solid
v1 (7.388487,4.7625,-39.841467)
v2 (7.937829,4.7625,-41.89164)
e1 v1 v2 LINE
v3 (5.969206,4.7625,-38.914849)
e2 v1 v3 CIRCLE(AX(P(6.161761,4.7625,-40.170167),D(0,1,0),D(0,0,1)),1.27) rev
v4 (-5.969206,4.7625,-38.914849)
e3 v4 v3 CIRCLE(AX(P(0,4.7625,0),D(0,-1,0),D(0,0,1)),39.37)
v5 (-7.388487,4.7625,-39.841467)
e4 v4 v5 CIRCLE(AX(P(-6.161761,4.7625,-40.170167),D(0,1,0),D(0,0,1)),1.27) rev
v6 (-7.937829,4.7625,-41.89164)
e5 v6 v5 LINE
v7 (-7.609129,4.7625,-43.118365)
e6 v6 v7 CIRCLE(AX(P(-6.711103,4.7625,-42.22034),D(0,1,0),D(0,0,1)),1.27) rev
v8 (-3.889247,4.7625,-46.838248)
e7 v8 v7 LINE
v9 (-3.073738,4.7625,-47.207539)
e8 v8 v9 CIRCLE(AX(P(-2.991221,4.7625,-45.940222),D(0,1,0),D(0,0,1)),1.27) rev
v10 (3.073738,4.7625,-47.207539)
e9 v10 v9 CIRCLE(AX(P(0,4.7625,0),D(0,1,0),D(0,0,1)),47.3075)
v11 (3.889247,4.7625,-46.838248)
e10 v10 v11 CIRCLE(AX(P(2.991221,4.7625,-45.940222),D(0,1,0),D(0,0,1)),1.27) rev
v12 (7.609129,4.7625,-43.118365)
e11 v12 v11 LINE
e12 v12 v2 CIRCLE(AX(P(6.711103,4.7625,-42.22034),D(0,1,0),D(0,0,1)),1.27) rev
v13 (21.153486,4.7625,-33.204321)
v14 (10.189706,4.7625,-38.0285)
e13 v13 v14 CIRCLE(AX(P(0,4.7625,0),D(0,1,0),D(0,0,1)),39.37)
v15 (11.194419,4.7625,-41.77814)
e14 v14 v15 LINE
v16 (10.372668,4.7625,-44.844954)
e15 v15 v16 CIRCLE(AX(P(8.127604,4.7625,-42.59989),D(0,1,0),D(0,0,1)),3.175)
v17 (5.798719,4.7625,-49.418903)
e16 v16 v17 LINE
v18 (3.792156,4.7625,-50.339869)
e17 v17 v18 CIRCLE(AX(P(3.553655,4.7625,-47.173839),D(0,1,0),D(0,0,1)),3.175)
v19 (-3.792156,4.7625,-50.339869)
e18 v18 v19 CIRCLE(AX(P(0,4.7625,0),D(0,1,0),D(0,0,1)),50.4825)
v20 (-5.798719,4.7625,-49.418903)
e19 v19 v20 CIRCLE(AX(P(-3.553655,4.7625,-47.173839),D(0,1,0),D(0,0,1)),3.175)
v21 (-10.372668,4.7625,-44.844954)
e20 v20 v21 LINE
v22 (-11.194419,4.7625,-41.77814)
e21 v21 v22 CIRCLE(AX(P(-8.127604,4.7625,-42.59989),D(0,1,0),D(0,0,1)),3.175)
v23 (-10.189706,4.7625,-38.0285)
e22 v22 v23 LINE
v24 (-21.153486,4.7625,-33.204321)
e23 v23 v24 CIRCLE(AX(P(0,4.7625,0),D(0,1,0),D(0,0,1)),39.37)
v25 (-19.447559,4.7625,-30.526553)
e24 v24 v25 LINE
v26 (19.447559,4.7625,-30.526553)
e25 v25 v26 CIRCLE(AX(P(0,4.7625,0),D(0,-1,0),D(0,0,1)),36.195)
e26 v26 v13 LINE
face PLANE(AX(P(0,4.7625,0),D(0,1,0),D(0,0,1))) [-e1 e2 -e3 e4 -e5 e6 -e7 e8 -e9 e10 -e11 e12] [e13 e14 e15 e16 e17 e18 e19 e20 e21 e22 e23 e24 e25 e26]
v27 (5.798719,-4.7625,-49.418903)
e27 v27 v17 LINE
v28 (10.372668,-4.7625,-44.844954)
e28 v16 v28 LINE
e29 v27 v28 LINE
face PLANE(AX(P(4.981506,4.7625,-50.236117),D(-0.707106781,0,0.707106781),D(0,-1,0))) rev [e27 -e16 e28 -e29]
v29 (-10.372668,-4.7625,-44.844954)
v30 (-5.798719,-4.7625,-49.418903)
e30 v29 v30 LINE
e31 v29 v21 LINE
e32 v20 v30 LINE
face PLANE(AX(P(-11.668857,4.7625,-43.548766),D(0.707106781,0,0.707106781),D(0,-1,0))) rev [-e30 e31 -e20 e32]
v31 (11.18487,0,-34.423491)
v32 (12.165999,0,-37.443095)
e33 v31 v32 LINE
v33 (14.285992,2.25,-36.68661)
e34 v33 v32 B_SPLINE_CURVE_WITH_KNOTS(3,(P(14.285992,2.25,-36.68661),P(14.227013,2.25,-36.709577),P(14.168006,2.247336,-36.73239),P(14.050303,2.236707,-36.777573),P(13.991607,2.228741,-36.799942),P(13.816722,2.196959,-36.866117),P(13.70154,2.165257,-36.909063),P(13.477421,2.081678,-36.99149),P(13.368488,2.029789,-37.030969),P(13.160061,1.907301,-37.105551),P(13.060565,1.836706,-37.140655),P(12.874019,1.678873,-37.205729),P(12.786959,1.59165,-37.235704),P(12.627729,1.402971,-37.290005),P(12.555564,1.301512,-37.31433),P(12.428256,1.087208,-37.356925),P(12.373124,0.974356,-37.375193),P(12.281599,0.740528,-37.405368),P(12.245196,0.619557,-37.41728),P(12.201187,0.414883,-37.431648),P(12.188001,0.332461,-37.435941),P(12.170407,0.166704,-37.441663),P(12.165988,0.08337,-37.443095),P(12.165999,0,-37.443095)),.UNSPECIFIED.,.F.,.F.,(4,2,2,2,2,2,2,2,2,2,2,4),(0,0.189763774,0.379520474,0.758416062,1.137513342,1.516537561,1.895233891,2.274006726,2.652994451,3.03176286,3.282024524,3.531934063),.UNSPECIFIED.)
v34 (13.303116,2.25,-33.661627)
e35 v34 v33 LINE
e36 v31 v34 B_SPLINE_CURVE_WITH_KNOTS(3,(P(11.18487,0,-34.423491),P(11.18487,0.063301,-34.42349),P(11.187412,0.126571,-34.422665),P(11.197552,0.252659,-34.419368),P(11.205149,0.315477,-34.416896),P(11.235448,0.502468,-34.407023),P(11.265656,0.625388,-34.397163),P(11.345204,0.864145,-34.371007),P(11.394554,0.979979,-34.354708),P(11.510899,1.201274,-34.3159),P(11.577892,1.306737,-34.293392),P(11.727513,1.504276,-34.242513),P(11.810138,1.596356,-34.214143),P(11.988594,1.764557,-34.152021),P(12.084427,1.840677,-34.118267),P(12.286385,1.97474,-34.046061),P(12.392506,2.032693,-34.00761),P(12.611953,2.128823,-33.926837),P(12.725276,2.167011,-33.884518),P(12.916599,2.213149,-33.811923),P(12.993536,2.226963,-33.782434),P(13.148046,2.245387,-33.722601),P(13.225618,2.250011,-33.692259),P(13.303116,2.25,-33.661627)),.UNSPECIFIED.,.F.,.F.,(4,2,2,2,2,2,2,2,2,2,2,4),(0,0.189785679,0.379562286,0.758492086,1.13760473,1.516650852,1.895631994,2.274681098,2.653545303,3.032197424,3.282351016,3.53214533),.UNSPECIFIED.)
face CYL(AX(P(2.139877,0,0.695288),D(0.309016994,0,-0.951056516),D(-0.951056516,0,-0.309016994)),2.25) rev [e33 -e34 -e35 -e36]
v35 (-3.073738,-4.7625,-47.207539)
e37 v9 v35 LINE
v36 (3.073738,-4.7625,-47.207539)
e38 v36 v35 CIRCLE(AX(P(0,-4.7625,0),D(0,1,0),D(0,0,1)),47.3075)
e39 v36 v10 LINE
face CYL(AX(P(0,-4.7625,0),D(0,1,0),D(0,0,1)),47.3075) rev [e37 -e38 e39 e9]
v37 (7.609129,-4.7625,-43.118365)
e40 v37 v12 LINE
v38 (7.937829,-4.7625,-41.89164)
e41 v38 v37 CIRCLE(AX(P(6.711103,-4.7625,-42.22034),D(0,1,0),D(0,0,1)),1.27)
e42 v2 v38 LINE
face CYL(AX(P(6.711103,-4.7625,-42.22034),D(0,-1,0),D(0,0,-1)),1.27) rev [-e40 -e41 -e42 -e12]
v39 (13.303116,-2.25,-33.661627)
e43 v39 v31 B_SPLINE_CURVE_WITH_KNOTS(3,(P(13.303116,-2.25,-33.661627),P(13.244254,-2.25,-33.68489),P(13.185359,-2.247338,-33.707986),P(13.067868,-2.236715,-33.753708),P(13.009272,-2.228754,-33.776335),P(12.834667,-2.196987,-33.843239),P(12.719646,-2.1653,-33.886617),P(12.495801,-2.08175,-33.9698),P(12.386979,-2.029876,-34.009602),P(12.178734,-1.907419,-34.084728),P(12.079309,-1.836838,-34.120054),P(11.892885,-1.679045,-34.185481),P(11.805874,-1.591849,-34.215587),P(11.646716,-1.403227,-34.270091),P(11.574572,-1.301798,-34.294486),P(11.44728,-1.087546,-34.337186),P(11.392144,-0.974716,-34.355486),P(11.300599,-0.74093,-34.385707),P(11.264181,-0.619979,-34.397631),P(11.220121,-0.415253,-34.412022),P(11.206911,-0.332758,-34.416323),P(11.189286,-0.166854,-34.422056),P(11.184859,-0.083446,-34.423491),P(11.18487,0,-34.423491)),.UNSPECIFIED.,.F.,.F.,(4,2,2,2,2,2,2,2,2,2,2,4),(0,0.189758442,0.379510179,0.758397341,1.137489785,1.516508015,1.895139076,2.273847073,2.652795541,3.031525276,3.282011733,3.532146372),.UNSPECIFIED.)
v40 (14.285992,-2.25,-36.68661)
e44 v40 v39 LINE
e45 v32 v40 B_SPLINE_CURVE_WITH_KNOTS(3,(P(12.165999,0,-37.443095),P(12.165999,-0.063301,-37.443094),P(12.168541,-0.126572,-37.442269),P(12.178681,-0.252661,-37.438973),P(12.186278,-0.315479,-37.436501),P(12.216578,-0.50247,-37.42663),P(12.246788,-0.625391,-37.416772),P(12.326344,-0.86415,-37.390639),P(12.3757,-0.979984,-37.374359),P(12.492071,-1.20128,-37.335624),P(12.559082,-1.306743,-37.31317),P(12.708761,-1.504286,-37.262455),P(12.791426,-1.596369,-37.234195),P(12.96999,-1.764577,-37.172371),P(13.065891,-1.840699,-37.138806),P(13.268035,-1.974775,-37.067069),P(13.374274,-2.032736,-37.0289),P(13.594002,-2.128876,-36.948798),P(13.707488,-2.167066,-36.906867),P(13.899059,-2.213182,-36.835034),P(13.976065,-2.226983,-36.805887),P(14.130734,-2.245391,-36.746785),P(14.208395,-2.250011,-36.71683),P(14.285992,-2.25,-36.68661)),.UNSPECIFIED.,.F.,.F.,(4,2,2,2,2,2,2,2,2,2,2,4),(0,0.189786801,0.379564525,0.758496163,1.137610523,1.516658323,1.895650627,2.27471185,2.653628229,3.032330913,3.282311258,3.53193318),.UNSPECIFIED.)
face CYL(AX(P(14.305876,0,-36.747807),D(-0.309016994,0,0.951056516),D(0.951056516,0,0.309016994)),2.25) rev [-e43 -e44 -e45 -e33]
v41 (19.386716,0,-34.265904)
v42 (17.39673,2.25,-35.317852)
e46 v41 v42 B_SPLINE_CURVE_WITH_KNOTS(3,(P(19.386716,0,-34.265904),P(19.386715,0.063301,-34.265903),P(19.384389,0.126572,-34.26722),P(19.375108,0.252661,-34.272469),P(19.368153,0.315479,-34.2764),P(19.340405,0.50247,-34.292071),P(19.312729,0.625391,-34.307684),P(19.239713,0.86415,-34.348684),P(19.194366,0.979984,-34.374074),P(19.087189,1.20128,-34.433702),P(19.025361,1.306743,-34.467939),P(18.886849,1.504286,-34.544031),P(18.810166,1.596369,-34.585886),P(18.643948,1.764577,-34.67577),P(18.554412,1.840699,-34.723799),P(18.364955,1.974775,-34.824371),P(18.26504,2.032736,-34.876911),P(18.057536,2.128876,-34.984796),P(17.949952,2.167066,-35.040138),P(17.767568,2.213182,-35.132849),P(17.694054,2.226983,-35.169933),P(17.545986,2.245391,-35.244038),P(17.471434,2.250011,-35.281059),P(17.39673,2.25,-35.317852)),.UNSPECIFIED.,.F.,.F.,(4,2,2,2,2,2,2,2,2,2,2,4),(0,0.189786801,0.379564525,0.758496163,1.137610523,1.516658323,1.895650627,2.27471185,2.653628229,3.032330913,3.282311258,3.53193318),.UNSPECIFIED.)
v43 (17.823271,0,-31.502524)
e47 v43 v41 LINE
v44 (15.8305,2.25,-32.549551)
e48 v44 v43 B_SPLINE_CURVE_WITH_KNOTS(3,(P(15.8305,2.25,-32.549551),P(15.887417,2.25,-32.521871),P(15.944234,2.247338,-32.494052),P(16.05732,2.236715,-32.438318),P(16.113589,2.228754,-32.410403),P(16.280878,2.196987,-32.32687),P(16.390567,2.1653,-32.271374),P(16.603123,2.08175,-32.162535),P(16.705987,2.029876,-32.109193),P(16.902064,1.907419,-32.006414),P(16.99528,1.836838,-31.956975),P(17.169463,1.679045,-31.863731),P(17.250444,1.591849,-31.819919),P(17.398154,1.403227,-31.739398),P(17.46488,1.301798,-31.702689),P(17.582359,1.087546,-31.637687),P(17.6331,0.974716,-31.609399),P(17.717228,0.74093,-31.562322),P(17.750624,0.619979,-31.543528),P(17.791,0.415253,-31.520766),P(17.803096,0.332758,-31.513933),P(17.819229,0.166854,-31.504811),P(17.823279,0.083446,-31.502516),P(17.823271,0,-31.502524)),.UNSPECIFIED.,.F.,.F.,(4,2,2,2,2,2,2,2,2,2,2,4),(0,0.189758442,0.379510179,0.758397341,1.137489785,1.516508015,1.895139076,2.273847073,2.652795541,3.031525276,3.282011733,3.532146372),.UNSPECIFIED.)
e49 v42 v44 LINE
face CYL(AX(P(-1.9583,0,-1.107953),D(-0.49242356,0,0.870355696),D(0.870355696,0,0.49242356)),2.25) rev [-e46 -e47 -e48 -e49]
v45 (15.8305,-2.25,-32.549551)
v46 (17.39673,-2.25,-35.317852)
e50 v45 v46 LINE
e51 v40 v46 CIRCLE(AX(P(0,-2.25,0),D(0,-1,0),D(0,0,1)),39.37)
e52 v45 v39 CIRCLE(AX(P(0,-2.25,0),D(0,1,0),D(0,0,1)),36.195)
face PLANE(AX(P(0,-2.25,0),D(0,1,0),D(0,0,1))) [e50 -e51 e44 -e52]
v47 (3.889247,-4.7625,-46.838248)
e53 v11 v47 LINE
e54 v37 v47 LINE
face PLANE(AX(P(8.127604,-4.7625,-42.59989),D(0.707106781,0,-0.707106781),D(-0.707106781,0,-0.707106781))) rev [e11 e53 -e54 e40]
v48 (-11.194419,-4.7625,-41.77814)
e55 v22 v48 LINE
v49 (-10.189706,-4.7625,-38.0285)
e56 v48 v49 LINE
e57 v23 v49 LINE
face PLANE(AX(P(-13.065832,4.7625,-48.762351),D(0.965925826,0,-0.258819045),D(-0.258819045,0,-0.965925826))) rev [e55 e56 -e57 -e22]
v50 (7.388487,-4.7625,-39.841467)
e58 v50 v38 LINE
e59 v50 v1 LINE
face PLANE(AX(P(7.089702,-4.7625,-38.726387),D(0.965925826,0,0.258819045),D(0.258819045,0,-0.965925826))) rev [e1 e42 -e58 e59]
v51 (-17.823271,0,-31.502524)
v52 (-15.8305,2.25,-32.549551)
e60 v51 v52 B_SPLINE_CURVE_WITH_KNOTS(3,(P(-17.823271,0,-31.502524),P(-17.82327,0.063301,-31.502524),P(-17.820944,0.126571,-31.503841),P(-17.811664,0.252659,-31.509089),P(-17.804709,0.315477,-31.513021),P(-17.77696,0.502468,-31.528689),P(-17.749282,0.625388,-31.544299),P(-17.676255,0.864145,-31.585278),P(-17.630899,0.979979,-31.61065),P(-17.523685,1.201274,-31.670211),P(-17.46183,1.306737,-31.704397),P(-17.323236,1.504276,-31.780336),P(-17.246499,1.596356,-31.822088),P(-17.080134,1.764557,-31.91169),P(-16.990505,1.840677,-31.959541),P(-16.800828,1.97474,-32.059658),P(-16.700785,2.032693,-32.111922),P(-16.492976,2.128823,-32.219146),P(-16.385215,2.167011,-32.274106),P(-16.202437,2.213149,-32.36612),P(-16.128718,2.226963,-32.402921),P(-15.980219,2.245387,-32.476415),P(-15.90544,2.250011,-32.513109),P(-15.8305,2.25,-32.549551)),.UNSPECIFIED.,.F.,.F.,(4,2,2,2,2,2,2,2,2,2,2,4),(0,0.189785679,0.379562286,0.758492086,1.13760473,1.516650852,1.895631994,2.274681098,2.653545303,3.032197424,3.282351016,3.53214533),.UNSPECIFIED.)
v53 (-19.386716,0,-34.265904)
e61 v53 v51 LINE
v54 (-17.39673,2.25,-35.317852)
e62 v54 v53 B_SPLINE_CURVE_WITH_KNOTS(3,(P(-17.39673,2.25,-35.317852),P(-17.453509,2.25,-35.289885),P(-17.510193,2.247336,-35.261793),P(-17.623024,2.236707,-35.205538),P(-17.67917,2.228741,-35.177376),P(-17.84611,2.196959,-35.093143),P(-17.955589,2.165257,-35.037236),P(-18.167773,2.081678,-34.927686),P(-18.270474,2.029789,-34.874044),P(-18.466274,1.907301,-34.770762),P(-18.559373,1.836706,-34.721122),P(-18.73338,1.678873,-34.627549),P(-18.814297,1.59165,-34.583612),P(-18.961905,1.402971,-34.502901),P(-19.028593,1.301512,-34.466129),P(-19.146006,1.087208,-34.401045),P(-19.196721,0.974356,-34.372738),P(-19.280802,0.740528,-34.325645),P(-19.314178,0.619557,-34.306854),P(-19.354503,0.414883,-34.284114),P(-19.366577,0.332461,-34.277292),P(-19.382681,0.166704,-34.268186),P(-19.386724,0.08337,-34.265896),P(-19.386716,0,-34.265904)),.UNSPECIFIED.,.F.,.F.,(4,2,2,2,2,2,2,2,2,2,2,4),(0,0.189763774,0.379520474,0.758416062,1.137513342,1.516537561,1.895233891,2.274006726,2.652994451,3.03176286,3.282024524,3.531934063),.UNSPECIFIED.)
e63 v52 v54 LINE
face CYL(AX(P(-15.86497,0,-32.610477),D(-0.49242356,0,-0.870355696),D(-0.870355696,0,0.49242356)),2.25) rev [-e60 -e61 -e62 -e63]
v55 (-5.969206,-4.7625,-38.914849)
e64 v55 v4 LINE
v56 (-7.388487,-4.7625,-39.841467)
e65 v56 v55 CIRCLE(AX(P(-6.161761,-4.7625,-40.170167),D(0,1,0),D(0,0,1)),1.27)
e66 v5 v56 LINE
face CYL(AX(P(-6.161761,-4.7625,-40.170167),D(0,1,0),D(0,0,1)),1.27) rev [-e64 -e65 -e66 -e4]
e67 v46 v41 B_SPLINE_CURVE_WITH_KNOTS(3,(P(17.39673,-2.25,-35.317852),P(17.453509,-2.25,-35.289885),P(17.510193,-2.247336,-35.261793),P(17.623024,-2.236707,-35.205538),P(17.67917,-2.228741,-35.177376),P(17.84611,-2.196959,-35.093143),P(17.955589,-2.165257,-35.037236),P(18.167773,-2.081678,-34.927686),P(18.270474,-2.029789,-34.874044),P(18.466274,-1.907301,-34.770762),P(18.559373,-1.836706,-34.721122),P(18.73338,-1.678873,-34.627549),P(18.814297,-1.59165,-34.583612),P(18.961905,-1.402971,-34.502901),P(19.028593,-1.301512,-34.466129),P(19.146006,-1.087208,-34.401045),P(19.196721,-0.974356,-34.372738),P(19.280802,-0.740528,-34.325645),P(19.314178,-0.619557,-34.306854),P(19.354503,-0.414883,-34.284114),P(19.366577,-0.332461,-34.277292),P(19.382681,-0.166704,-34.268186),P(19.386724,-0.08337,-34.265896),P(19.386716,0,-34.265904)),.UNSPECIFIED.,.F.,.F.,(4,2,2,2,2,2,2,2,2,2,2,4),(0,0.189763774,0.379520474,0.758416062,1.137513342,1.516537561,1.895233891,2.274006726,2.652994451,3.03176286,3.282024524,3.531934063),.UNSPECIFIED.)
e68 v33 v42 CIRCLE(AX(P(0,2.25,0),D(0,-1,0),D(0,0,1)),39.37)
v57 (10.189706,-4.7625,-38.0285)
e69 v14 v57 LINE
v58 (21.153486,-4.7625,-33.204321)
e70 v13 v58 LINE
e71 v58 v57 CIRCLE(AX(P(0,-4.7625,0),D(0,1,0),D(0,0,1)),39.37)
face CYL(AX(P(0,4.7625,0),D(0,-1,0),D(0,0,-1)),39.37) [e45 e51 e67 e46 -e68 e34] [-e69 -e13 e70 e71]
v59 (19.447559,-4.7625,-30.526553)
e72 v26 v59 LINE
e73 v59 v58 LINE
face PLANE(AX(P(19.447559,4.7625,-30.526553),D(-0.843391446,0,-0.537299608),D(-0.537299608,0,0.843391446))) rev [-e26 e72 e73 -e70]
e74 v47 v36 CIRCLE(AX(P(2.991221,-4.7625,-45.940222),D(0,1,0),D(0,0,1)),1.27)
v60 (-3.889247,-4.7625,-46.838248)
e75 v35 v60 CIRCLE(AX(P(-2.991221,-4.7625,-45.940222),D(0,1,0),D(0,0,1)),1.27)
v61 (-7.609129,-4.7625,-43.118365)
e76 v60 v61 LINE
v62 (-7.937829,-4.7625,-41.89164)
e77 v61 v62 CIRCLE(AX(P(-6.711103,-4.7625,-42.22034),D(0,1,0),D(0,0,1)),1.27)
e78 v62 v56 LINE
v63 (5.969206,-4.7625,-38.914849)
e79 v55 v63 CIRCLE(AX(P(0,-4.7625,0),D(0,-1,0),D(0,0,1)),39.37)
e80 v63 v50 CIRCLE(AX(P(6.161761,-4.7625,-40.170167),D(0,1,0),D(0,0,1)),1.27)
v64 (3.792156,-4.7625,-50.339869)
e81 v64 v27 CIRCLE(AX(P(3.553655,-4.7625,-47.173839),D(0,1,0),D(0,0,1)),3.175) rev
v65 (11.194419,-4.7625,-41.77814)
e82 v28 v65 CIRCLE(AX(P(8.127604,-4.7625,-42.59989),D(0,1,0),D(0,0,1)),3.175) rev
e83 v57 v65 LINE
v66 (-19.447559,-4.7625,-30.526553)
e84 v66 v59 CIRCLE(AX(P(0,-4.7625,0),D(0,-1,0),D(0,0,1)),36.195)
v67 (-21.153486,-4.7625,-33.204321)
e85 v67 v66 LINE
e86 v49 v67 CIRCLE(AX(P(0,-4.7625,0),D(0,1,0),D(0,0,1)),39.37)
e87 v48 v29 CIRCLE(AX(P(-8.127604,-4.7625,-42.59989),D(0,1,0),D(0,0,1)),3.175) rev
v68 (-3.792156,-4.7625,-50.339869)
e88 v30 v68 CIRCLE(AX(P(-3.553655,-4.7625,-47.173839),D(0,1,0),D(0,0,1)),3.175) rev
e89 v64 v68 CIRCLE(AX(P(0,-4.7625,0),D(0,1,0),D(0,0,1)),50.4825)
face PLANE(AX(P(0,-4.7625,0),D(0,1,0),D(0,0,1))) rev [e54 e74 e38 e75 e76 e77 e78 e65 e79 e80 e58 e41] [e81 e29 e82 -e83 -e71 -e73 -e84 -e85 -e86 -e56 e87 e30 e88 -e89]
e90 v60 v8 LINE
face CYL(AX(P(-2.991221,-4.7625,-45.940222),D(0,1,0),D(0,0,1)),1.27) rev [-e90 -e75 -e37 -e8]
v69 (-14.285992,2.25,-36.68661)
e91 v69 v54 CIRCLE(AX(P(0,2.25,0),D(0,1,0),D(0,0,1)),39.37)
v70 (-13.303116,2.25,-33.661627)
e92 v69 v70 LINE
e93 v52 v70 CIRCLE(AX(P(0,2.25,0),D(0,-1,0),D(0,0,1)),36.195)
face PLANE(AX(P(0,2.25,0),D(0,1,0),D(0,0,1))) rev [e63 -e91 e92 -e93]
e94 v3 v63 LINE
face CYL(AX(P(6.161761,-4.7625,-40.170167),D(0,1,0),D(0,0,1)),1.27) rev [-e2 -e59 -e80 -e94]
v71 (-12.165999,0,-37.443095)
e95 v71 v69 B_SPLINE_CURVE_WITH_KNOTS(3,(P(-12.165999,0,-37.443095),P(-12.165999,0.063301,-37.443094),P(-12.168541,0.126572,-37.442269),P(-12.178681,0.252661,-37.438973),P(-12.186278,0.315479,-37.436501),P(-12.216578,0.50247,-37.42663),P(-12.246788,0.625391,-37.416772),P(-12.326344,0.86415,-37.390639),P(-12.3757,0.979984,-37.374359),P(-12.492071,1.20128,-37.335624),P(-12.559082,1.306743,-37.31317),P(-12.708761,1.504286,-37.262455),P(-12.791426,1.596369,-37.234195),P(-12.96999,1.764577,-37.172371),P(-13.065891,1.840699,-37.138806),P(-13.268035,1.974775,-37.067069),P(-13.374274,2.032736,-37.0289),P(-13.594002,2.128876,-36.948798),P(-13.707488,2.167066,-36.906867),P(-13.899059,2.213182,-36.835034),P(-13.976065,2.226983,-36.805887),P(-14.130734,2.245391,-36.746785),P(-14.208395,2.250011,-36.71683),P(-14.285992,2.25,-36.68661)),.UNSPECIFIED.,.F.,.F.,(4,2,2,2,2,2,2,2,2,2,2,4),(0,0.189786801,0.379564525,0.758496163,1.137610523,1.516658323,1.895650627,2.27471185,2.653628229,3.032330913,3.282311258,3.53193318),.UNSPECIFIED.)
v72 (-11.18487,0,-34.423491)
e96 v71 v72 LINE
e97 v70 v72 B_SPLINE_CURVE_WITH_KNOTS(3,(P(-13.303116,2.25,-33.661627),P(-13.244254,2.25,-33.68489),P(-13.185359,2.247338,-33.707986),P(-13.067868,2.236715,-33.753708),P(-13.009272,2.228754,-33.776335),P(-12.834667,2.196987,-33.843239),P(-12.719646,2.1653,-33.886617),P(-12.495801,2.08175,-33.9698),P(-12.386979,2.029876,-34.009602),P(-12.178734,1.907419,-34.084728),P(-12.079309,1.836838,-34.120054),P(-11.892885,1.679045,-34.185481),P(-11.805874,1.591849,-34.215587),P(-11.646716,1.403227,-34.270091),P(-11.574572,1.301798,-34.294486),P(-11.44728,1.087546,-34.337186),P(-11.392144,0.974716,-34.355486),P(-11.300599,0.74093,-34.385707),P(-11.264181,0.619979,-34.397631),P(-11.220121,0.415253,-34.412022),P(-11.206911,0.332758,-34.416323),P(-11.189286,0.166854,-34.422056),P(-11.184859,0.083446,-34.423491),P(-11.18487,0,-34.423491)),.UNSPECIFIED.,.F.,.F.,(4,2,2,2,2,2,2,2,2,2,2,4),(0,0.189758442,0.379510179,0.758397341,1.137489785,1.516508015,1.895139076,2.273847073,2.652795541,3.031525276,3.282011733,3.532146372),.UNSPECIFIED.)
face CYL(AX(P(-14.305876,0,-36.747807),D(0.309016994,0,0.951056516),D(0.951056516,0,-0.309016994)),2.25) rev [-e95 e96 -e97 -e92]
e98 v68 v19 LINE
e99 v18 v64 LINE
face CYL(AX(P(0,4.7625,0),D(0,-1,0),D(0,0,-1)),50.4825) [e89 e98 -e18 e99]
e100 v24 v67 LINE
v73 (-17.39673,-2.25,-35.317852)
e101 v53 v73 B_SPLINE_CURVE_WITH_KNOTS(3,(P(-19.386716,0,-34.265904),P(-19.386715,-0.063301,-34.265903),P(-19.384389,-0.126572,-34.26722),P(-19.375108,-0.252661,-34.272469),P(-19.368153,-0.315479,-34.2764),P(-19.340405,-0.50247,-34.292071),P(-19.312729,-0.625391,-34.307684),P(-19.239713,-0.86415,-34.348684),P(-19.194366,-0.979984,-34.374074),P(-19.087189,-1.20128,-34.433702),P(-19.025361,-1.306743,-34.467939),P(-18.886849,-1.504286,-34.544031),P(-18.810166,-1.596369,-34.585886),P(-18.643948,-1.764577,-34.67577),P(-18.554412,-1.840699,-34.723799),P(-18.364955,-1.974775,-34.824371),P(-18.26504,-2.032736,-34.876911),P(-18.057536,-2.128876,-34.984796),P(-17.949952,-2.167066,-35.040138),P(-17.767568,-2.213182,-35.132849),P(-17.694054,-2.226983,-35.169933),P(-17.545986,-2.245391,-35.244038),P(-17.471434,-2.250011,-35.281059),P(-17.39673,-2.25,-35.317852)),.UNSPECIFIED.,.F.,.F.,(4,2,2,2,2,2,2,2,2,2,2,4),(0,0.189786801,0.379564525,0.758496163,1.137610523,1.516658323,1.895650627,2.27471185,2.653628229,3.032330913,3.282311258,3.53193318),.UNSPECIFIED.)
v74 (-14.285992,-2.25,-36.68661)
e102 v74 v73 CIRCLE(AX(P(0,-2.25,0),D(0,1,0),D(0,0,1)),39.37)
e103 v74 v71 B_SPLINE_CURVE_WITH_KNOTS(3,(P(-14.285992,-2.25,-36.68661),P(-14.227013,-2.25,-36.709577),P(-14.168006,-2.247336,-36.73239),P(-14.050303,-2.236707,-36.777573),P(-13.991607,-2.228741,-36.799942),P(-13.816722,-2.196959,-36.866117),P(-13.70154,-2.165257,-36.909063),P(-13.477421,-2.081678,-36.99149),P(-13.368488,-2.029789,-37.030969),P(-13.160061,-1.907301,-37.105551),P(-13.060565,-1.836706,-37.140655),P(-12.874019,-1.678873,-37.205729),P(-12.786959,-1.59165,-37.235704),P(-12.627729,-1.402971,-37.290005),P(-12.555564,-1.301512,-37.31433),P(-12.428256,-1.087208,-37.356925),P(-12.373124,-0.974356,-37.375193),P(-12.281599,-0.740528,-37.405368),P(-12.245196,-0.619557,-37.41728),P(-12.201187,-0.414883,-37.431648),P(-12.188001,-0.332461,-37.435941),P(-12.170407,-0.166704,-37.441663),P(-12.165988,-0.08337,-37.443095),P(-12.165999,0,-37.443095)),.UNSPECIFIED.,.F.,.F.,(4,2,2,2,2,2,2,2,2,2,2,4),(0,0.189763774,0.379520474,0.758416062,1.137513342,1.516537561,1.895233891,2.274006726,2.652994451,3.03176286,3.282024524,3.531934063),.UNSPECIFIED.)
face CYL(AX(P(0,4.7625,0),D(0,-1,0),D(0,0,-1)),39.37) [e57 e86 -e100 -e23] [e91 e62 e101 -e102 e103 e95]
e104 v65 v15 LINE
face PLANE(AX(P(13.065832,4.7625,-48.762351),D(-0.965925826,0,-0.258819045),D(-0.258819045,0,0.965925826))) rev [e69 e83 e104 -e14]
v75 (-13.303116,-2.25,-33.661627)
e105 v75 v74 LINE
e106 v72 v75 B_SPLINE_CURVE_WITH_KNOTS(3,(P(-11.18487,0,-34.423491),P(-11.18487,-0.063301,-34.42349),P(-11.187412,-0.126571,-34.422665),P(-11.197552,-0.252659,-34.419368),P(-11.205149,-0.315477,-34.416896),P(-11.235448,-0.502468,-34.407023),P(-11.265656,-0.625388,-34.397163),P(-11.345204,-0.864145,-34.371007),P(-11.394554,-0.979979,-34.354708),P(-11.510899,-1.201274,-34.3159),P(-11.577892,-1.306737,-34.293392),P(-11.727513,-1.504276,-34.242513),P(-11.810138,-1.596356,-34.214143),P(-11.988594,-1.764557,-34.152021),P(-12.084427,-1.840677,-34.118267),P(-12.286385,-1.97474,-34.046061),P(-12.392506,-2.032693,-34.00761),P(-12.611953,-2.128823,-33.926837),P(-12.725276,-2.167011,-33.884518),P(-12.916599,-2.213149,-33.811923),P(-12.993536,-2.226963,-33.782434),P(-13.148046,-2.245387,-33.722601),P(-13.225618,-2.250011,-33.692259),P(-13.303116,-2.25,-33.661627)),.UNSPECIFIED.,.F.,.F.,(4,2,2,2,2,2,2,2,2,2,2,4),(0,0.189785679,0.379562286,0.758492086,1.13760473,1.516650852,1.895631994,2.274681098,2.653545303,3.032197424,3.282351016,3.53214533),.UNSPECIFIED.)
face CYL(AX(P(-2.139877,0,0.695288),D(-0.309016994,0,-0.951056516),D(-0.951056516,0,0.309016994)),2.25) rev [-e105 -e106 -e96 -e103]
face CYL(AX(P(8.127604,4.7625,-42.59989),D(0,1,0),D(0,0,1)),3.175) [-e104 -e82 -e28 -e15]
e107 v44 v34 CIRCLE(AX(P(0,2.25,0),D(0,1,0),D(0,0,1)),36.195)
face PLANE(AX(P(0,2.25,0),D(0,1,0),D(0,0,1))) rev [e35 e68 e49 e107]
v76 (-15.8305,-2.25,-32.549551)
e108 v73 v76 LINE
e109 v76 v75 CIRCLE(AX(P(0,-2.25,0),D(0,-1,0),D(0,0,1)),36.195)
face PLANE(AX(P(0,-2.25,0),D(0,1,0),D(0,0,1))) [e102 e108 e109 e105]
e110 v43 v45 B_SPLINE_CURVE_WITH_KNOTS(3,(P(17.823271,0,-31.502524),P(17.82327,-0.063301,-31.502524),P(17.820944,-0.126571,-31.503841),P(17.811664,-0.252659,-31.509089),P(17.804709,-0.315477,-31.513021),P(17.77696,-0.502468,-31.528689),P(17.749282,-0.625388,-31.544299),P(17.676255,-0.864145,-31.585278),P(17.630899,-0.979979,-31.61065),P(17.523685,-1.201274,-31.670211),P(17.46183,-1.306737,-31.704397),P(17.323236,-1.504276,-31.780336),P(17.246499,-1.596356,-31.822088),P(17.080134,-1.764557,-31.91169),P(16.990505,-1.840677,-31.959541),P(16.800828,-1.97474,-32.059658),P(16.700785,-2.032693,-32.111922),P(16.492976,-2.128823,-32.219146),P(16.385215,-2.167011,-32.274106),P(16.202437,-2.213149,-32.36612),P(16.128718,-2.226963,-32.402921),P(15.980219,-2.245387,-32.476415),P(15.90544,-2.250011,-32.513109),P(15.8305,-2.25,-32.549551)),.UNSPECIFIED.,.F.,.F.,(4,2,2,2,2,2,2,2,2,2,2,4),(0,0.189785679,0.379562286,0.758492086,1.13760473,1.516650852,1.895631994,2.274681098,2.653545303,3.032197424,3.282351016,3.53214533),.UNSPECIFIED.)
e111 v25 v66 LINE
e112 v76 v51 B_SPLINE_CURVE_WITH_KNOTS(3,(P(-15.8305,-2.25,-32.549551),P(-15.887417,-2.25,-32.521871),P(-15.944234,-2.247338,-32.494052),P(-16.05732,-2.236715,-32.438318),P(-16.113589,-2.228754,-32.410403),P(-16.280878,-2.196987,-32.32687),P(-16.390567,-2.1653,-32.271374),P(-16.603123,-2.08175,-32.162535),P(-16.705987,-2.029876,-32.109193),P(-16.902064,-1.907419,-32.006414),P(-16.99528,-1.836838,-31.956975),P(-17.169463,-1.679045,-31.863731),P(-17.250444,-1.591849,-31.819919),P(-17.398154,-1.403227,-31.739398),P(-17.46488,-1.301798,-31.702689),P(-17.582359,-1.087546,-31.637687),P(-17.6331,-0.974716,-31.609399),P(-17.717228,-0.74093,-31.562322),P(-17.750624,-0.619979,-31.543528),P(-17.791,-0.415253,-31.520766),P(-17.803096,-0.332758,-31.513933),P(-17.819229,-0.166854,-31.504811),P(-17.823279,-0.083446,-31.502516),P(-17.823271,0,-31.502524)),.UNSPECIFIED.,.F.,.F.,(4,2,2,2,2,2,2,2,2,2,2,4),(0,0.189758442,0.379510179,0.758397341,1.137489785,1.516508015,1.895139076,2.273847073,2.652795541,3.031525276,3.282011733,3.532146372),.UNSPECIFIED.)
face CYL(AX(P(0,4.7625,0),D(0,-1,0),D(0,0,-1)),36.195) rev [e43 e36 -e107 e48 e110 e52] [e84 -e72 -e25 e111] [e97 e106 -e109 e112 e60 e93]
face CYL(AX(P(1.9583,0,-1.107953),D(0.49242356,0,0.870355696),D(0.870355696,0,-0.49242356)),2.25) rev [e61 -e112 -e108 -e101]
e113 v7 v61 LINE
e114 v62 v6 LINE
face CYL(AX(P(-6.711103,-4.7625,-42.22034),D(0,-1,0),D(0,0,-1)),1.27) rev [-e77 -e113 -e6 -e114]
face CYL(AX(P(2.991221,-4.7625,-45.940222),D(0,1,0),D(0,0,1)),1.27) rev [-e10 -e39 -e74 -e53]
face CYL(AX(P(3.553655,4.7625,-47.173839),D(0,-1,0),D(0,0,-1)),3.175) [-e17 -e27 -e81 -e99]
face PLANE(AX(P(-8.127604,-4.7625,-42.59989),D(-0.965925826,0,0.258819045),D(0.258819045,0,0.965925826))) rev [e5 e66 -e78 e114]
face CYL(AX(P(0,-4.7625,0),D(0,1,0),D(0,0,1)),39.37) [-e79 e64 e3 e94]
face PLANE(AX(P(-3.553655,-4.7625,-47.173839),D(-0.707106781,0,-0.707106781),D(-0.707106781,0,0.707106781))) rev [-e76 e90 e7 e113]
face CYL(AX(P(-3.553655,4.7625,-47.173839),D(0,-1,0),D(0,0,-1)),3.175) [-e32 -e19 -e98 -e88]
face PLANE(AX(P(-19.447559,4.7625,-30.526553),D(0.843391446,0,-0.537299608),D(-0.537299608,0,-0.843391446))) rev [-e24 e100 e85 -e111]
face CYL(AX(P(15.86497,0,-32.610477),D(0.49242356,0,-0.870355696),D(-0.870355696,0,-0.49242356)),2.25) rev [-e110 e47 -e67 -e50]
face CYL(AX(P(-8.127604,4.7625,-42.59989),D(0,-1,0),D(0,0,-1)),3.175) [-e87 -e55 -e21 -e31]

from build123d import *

# Parameters (mm, degrees)
BOSS_EXTRUDE1_DEPTH  = 4.7625
CHAMFER1_SIZE        = 5.3975
CUT_EXTRUDE1_DEPTH   = 2.25
FILLET1_R            = 2.25
FILLET1_OF_MIRROR1_R = 2.25
FILLET2_R            = 3.175
CUT_EXTRUDE2_DEPTH   = 56.557883235
FILLET3_R            = 1.27


# Some blends are built 0.0001 mm under size
with BuildPart() as part:
    # Sketch1 → Boss-Extrude1 (new, symmetric)
    with BuildSketch(Plane(origin=(0, 0, 0), x_dir=(1, 0, 0), z_dir=(0, 1, 0))):
        with BuildLine():
            Line((-19.447559324, 30.526553381), (-21.153485581, 33.204321222))
            ThreePointArc((-21.153485581, 33.204321222), (-15.85613718, 36.035812933), (-10.189705806, 38.028499781))
            Line((-10.189705806, 38.028499781), (-13.065832444, 48.762350526))
            ThreePointArc((-13.065832444, 48.762350526), (0, 50.4825), (13.065832444, 48.762350526))
            Line((13.065832444, 48.762350526), (10.189705806, 38.028499781))
            ThreePointArc((10.189705806, 38.028499781), (15.85613718, 36.035812933), (21.153485581, 33.204321222))
            Line((21.153485581, 33.204321222), (19.447559324, 30.526553381))
            ThreePointArc((19.447559324, 30.526553381), (0, 36.195), (-19.447559324, 30.526553381))
        make_face()
    extrude(amount=BOSS_EXTRUDE1_DEPTH, both=True)

    # Chamfer1
    # the kernel refuses this chamfer: 9.348744234, 5.3975 mm, written as the material it takes off along each edge
    with BuildSketch(Plane(origin=(-13.065832444, 26.081931668, -48.762350526), x_dir=(0.9837865219812311, 0, -0.17934346703482887), z_dir=(0, -1, 0))) as chamfer1_piece_1:
        with BuildLine():
            Line((8.217561706, 0), (CHAMFER1_SIZE * 0.0813902016187, CHAMFER1_SIZE * 0.99668231402))
            Line((CHAMFER1_SIZE * 0.0813902016187, CHAMFER1_SIZE * 0.99668231402), (0, 0))
            ThreePointArc((0, 0), (4.262745394, -0.167250297), (8.217561706, 0))
        make_face()
    extrude(amount=52.163863336, mode=Mode.SUBTRACT)
    with BuildSketch(Plane(origin=(13.065832444, -26.081931668, -48.762350526), x_dir=(-0.25881904510252207, 0, 0.965925826289068), z_dir=(0, 1, 0))) as chamfer1_piece_2:
        with BuildLine():
            Line((CHAMFER1_SIZE, 0), (0.668829004, -8.190298417))
            ThreePointArc((0.668829004, -8.190298417), (0.180250294, -4.262215479), (0, 0))
            Line((0, 0), (CHAMFER1_SIZE, 0))
        make_face()
    extrude(amount=52.163863336, mode=Mode.SUBTRACT)

    # Sketch2 → Cut-Extrude1 (cut, symmetric)
    with BuildSketch(Plane(origin=(0, 0, 0), x_dir=(1, 0, 0), z_dir=(0, 1, 0))):
        with BuildLine():
            Line((-12.165999069, 37.443095047), (-11.184870111, 34.423490607))
            ThreePointArc((-11.184870111, 34.423490607), (-14.577416439, 33.129698987), (-17.823270758, 31.502524415))
            Line((-17.823270758, 31.502524415), (-19.386715561, 34.265903749))
            ThreePointArc((-19.386715561, 34.265903749), (-15.85613718, 36.035812933), (-12.165999069, 37.443095047))
        make_face()
    cut_extrude1 = extrude(amount=CUT_EXTRUDE1_DEPTH, both=True, mode=Mode.SUBTRACT)

    # Fillet1
    fillet1_edges = [part.edges().sort_by_distance(p)[0] for p in [
        (-18.60499316, -2.25, -32.884214082),
        (-18.60499316, 2.25, -32.884214082),
        (-11.67543459, 2.25, -35.933292827),
        (-11.67543459, -2.25, -35.933292827),
    ]]
    fillet(fillet1_edges, radius=FILLET1_R - 0.0001)  # a hair under: the kernel refuses the full size

    # Mirror1: Cut-Extrude1 across plane
    add(cut_extrude1.mirror(Plane(origin=(0, 0, 0), x_dir=(0, 0, 1), z_dir=(1, 0, 0))), mode=Mode.SUBTRACT)

    # Fillet1 of Mirror1
    fillet1_of_mirror1_edges = [part.edges().sort_by_distance(p)[0] for p in [
        (18.60499316, -2.25, -32.884214082),
        (18.60499316, 2.25, -32.884214082),
        (11.67543459, 2.25, -35.933292827),
        (11.67543459, -2.25, -35.933292827),
    ]]
    fillet(fillet1_of_mirror1_edges, radius=FILLET1_OF_MIRROR1_R - 0.0001)  # a hair under: the kernel refuses the full size

    # Fillet2
    fillet2_edges = [part.edges().sort_by_distance(p)[0] for p in [
        (-11.668856648, 0, -43.548765878),
        (4.981505994, 0, -50.236116533),
        (-4.981505994, 0, -50.236116533),
        (11.668856648, 0, -43.548765878),
    ]]
    fillet(fillet2_edges, radius=FILLET2_R)

    # Sketch3 → Cut-Extrude2 (cut, through all)
    with BuildSketch(Plane(origin=(0, 4.7625, 0), x_dir=(1, 0, 0), z_dir=(0, 1, 0))):
        with BuildLine():
            Line((7.089702157, 38.726386655), (8.127604296, 42.59989017))
            Line((8.127604296, 42.59989017), (3.553655431, 47.173839035))
            ThreePointArc((3.553655431, 47.173839035), (0, 47.3075), (-3.553655431, 47.173839035))
            Line((-3.553655431, 47.173839035), (-8.127604296, 42.59989017))
            Line((-8.127604296, 42.59989017), (-7.089702157, 38.726386655))
            ThreePointArc((-7.089702157, 38.726386655), (0, 39.37), (7.089702157, 38.726386655))
        make_face()
    extrude(amount=-CUT_EXTRUDE2_DEPTH, mode=Mode.SUBTRACT)

    # Fillet3
    fillet3_edges = [part.edges().sort_by_distance(p)[0] for p in [
        (7.089702157, 0, -38.726386655),
        (-7.089702157, 0, -38.726386655),
        (-8.127604296, 0, -42.59989017),
        (-3.553655431, 0, -47.173839035),
        (3.553655431, 0, -47.173839035),
        (8.127604296, 0, -42.59989017),
    ]]
    fillet(fillet3_edges, radius=FILLET3_R)


solid = part.part
